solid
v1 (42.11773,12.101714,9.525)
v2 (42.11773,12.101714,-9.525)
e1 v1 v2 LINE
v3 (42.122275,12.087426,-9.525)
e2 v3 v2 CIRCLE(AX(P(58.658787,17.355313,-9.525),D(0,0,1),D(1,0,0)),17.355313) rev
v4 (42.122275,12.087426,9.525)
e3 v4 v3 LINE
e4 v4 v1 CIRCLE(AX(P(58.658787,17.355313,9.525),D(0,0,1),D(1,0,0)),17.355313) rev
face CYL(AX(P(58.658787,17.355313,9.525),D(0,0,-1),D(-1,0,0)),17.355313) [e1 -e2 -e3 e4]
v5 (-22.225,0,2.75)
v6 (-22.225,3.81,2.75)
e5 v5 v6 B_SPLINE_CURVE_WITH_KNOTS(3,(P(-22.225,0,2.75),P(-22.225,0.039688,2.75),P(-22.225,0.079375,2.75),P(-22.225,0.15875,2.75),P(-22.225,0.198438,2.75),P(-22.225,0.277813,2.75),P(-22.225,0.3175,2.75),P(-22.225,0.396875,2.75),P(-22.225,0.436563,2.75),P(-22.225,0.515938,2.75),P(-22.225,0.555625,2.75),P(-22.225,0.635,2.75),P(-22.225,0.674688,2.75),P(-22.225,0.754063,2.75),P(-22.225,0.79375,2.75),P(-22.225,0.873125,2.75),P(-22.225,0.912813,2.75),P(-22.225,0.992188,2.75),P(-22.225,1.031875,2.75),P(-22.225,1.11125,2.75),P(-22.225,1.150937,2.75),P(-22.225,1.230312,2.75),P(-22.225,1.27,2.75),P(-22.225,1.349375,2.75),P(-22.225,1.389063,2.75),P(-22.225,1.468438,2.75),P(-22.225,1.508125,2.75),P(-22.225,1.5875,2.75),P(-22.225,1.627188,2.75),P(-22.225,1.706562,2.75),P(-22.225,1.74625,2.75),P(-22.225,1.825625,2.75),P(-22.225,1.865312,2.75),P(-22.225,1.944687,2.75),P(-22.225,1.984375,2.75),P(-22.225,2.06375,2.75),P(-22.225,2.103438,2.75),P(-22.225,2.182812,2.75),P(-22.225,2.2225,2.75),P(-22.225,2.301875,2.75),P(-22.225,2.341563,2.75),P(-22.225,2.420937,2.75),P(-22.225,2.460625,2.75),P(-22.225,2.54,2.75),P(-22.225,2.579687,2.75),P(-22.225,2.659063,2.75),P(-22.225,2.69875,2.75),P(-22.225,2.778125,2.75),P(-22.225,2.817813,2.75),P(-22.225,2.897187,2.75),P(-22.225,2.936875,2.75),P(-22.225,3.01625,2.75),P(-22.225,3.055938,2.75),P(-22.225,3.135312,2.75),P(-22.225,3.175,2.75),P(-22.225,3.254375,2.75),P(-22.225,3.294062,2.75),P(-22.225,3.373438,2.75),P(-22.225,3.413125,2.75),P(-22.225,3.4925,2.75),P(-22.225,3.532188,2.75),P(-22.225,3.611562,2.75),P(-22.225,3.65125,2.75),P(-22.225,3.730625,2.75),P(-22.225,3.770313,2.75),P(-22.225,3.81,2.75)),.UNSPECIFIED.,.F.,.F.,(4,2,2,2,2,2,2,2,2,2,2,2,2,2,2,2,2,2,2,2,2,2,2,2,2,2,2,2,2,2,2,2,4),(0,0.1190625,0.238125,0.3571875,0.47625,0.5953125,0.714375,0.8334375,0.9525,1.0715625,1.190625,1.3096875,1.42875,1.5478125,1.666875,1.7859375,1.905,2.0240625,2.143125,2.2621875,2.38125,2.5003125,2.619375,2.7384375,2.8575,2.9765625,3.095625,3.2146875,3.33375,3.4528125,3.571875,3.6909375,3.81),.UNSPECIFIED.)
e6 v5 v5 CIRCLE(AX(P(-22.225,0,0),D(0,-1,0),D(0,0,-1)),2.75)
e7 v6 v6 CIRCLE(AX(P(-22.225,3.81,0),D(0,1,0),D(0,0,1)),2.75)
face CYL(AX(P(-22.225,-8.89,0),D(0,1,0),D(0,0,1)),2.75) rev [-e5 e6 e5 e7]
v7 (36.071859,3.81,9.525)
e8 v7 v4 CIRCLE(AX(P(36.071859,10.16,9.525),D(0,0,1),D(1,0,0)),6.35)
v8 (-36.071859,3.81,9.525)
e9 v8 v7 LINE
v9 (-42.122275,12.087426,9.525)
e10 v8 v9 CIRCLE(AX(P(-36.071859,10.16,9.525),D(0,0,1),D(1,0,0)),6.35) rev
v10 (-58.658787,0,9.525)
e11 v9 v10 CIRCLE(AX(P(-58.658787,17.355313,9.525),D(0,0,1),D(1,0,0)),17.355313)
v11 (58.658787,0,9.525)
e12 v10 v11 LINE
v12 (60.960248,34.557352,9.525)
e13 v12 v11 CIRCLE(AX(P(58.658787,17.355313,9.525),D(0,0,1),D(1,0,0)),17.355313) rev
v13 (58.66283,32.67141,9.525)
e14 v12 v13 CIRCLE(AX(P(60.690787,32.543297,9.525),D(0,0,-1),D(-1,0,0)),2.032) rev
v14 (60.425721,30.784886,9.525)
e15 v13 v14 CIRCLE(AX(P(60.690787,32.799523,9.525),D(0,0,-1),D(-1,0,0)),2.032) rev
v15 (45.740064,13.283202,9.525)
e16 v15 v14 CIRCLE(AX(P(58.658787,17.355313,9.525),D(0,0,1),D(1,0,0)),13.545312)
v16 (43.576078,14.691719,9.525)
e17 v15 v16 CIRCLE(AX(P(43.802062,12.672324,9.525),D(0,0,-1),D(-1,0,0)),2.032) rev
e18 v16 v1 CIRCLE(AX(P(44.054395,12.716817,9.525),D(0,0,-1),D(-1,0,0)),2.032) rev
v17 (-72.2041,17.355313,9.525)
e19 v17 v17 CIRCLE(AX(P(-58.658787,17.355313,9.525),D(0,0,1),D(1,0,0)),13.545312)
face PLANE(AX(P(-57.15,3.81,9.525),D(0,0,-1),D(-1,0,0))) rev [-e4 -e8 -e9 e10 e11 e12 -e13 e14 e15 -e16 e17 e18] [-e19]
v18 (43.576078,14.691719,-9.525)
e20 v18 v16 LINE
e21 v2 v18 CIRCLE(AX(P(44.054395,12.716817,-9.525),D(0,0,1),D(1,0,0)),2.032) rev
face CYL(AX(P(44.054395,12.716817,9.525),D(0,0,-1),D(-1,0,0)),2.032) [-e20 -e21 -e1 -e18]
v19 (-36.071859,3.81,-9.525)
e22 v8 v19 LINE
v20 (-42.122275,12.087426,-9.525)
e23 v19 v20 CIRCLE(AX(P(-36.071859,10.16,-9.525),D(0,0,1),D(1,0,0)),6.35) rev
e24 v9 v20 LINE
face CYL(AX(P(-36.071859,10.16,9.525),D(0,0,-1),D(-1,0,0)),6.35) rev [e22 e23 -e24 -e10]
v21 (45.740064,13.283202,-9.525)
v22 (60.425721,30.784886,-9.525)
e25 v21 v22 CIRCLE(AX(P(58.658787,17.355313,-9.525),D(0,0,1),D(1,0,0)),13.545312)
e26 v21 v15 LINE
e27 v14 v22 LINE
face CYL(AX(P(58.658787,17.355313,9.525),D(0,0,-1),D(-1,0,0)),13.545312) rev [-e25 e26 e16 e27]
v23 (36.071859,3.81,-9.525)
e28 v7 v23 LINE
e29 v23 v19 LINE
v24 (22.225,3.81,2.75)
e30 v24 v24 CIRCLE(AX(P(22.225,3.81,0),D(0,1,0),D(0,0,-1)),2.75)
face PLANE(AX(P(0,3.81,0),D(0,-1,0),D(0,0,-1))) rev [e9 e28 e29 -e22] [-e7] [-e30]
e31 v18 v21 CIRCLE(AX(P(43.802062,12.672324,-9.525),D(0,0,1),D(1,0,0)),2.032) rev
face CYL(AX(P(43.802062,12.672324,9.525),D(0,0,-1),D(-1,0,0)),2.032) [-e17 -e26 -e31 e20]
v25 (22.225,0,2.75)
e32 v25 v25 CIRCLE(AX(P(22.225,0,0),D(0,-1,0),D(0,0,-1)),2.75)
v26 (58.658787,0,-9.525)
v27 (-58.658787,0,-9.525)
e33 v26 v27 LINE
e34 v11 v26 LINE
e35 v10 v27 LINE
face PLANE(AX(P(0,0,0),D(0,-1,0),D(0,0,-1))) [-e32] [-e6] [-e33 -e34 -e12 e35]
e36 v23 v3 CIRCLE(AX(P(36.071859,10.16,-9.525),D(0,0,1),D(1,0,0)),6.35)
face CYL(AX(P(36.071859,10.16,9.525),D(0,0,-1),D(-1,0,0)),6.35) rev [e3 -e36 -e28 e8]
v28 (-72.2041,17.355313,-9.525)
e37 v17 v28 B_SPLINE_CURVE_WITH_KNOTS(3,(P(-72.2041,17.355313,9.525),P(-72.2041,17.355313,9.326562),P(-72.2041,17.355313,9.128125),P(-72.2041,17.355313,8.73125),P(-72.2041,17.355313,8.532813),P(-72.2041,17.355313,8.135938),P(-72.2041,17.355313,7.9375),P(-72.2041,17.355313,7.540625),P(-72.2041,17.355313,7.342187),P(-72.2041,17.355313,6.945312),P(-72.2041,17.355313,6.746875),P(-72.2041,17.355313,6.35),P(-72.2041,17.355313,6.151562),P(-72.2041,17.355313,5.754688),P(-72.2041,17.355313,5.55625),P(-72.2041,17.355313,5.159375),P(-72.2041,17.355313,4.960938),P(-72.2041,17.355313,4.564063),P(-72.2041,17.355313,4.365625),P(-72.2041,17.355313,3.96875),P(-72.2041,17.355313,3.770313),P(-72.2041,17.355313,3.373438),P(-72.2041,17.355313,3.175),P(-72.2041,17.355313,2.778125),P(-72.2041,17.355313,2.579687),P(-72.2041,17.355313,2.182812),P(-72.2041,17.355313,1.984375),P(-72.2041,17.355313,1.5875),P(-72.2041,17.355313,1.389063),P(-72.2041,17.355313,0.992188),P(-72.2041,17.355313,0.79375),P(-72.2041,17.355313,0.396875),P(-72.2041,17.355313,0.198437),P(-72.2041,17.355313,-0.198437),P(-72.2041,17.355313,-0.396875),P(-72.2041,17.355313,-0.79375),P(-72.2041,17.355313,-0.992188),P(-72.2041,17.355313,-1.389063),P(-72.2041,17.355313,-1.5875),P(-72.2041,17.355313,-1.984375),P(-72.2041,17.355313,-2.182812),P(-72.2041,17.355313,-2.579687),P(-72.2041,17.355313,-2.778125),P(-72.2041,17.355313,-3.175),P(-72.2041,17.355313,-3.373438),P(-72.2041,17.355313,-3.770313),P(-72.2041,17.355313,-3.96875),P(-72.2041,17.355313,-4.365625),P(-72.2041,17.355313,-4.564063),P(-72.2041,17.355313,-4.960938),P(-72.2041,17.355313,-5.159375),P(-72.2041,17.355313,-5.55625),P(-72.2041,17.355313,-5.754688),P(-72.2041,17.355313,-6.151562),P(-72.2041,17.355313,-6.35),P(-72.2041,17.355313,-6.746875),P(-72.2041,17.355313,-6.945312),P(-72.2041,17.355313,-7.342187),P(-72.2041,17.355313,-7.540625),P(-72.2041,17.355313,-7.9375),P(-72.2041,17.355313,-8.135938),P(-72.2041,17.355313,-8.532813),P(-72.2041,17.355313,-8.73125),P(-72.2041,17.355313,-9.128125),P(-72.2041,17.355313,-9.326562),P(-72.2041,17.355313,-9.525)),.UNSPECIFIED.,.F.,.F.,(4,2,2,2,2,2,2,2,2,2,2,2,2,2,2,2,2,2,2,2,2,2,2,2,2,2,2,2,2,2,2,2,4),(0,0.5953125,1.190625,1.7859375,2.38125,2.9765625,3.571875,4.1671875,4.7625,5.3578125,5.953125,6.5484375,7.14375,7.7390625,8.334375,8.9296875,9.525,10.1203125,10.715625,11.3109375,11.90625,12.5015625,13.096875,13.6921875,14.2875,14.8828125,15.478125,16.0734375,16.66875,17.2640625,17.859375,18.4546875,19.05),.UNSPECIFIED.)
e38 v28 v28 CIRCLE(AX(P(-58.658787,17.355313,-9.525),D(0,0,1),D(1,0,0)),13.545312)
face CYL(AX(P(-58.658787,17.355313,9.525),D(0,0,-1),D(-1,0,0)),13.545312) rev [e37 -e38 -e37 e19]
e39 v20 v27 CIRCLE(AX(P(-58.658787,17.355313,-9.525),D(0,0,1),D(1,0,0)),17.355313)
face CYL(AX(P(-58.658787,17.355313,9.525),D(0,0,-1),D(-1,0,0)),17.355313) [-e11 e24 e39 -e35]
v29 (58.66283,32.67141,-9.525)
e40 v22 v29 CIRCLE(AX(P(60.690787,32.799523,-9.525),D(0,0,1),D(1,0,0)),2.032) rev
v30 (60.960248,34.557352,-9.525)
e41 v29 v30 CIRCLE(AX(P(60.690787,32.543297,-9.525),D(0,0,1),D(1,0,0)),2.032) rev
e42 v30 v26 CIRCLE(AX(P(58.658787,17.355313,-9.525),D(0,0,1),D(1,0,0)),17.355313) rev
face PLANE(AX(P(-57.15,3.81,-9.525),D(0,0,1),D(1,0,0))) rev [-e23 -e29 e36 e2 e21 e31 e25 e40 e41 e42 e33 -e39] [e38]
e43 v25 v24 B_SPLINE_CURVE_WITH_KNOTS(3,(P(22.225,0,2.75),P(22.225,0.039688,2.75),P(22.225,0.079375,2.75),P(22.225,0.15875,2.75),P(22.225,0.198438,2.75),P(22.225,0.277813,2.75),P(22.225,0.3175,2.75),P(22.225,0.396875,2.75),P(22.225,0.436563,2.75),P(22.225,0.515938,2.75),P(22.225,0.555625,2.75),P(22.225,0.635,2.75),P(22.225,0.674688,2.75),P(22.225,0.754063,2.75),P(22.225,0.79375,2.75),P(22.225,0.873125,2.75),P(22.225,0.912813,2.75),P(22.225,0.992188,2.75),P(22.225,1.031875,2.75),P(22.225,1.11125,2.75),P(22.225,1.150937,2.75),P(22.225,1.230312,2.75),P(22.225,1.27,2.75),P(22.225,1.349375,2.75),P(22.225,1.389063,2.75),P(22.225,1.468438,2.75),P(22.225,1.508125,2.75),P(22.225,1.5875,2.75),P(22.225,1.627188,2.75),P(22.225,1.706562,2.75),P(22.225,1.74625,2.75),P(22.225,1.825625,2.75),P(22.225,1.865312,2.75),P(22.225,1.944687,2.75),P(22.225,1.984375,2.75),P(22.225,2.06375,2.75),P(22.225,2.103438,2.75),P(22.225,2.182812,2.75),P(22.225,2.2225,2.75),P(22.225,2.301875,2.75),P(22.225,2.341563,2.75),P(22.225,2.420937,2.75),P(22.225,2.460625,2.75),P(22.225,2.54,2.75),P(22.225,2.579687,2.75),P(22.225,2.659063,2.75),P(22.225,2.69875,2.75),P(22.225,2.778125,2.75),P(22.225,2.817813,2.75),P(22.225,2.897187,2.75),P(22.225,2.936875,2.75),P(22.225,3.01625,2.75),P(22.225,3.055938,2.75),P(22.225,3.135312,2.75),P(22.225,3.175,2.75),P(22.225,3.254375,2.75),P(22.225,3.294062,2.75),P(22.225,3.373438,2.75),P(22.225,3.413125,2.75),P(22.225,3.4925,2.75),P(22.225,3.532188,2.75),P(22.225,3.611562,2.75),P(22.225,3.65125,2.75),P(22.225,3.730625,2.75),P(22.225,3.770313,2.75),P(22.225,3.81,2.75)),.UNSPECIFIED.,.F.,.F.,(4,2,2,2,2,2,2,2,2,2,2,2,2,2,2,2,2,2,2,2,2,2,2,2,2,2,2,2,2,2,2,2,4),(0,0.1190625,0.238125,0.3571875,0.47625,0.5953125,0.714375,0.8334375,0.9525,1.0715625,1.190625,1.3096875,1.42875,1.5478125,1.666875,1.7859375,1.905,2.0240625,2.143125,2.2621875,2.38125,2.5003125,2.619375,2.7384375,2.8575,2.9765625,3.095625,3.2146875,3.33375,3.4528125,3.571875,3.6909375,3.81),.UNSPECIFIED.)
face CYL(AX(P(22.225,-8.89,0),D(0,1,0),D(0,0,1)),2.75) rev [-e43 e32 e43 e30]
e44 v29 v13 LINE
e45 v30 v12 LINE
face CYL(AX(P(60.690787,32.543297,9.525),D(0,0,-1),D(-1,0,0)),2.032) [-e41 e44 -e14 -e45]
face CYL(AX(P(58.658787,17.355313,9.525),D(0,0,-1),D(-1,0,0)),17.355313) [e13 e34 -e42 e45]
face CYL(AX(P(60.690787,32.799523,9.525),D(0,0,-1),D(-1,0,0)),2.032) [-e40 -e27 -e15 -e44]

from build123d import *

# Parameters (mm, degrees)
SKETCH3_W           = 114.3
SKETCH3_H           = 19.05
BOSS_EXTRUDE1_DEPTH = 3.81
SKETCH4_R           = 13.5453125
BOSS_EXTRUDE2_DEPTH = 9.525
FILLET1_R           = 2.032
SKETCH5_R           = 2.75
CUT_EXTRUDE4_DEPTH  = 12.7


with BuildPart() as part:
    # Sketch3 → Boss-Extrude1 (new body)
    with BuildSketch(Plane(origin=(0, 0, 0), x_dir=(1, 0, 0), z_dir=(0, 1, 0))):
        Rectangle(SKETCH3_W, SKETCH3_H)
    extrude(amount=BOSS_EXTRUDE1_DEPTH)

    # Sketch4 → Boss-Extrude2 (add, symmetric)
    with BuildSketch(Plane.XY):
        with BuildLine():
            Line((-36.071859255, 3.81), (36.071859255, 3.81))
            ThreePointArc((36.071859255, 3.81), (41.198342199, 6.412778013), (42.122274879, 12.087425946))
            ThreePointArc((42.122274879, 12.087425946), (41.806974837, 13.2052175), (41.567140999, 14.341594112))
            Line((41.567140999, 14.341594112), (45.319258538, 15.003193668))
            ThreePointArc((45.319258538, 15.003193668), (67.365546349, 6.979001129), (63.291557028, 30.083742702))
            ThreePointArc((63.291557028, 30.083742702), (61.010906137, 30.694841267), (58.658787305, 30.900625))
            Line((58.658787305, 30.900625), (58.658787305, 34.710625))
            ThreePointArc((58.658787305, 34.710625), (61.672505693, 34.446958806), (64.594653774, 33.663971588))
            ThreePointArc((64.594653774, 33.663971588), (75.750433611, 14.341594112), (58.658787305, 0))
            Line((58.658787305, 0), (-58.658787305, 0))
            ThreePointArc((-58.658787305, 0), (-70.930846463, 5.083253342), (-76.014099805, 17.3553125))
            ThreePointArc((-76.014099805, 17.3553125), (-55.993216901, 34.504703346), (-42.122274879, 12.087425946))
            ThreePointArc((-42.122274879, 12.087425946), (-41.198342199, 6.412778013), (-36.071859255, 3.81))
        make_face()
        with Locations(Location((-58.658787305, 17.3553125, 0), (0, 0, 180))):
            Circle(SKETCH4_R, mode=Mode.SUBTRACT)
    extrude(amount=BOSS_EXTRUDE2_DEPTH, both=True)

    # Fillet1
    # the kernel refuses this fillet: 2.032 mm, written as the material it takes off along each edge
    with BuildSketch(Plane(origin=(58.658787305, 34.710625, 0), x_dir=(0, -1, 0), z_dir=(0, 0, -1)), Plane(origin=(41.567140999, 14.341594112, 0), x_dir=(0.9848077530122078, 0.17364817766693208, 0), z_dir=(0, 0, 1))) as fillet1_piece_1:
        with BuildLine():
            CenterArc((2.16732771, -2.032), FILLET1_R, 90, 97.620348072)
            ThreePointArc((0.153273302, -2.301460275), (0.03836072, -1.153279249), (0, 0))
            Line((0, 0), (2.16732771, 0))
        make_face()
    extrude(amount=15.291396244, mode=Mode.SUBTRACT)
    with BuildSketch(Plane(origin=(58.658787305, 30.900625, 0), x_dir=(0.9978615634411592, -0.06536283505758803, 0), z_dir=(0, 0, -1)), Plane(origin=(45.319258538, 15.003193668, 0), x_dir=(0.23764666877900192, -0.9713516669148425, 0), z_dir=(0, 0, 1))) as fillet1_piece_2:
        with BuildLine():
            CenterArc((1.903537334, -2.027654697), FILLET1_R, 93.747686363, 82.504627273)
            Line((-0.124117363, -1.894837416), (0, 0))
            ThreePointArc((0, 0), (0.885360027, -0.028965791), (1.770720053, 0))
        make_face()
    extrude(amount=14.272245223, mode=Mode.SUBTRACT)
    with BuildSketch(Plane(origin=(45.319258538, 15.003193668, 0), x_dir=(-0.9848077530122076, -0.17364817766693288, 0), z_dir=(0, 0, -1)), Plane(origin=(58.658787305, 30.900625, 0), x_dir=(0, 1, 0), z_dir=(0, 0, 1))) as fillet1_piece_3:
        with BuildLine():
            CenterArc((1.898898089, -2.032), FILLET1_R, 90, 82.504627273)
            ThreePointArc((-0.115739283, -1.766933481), (-0.028965791, -0.885360027), (0, 0))
            Line((0, 0), (1.898898089, 0))
        make_face()
    extrude(amount=14.272245223, mode=Mode.SUBTRACT)
    with BuildSketch(Plane(origin=(41.567140999, 14.341594112, 0), x_dir=(0.23870589854739682, -0.9710919081110089, 0), z_dir=(0, 0, -1)), Plane(origin=(58.658787305, 34.710625, 0), x_dir=(0.9977896842762429, -0.06645107938864023, 0), z_dir=(0, 0, 1))) as fillet1_piece_4:
        with BuildLine():
            CenterArc((2.171529904, -2.027508638), FILLET1_R, 86.189825964, 97.620348072)
            Line((0.144021266, -2.162537232), (0, 0))
            ThreePointArc((0, 0), (1.153279249, 0.03836072), (2.306558498, 0))
        make_face()
    extrude(amount=15.291396244, mode=Mode.SUBTRACT)

    # Sketch5 → Cut-Extrude4 (cut)
    with BuildSketch(Plane(origin=(0, 3.81, 0), x_dir=(1, 0, 0), z_dir=(0, 1, 0))):
        with Locations(Location((-22.225, 0, 0), (0, 0, 270))):
            Circle(SKETCH5_R)
        with Locations(Location((22.225, 0, 0), (0, 0, 270))):
            Circle(SKETCH5_R)
    extrude(amount=-CUT_EXTRUDE4_DEPTH, mode=Mode.SUBTRACT)


solid = part.part
